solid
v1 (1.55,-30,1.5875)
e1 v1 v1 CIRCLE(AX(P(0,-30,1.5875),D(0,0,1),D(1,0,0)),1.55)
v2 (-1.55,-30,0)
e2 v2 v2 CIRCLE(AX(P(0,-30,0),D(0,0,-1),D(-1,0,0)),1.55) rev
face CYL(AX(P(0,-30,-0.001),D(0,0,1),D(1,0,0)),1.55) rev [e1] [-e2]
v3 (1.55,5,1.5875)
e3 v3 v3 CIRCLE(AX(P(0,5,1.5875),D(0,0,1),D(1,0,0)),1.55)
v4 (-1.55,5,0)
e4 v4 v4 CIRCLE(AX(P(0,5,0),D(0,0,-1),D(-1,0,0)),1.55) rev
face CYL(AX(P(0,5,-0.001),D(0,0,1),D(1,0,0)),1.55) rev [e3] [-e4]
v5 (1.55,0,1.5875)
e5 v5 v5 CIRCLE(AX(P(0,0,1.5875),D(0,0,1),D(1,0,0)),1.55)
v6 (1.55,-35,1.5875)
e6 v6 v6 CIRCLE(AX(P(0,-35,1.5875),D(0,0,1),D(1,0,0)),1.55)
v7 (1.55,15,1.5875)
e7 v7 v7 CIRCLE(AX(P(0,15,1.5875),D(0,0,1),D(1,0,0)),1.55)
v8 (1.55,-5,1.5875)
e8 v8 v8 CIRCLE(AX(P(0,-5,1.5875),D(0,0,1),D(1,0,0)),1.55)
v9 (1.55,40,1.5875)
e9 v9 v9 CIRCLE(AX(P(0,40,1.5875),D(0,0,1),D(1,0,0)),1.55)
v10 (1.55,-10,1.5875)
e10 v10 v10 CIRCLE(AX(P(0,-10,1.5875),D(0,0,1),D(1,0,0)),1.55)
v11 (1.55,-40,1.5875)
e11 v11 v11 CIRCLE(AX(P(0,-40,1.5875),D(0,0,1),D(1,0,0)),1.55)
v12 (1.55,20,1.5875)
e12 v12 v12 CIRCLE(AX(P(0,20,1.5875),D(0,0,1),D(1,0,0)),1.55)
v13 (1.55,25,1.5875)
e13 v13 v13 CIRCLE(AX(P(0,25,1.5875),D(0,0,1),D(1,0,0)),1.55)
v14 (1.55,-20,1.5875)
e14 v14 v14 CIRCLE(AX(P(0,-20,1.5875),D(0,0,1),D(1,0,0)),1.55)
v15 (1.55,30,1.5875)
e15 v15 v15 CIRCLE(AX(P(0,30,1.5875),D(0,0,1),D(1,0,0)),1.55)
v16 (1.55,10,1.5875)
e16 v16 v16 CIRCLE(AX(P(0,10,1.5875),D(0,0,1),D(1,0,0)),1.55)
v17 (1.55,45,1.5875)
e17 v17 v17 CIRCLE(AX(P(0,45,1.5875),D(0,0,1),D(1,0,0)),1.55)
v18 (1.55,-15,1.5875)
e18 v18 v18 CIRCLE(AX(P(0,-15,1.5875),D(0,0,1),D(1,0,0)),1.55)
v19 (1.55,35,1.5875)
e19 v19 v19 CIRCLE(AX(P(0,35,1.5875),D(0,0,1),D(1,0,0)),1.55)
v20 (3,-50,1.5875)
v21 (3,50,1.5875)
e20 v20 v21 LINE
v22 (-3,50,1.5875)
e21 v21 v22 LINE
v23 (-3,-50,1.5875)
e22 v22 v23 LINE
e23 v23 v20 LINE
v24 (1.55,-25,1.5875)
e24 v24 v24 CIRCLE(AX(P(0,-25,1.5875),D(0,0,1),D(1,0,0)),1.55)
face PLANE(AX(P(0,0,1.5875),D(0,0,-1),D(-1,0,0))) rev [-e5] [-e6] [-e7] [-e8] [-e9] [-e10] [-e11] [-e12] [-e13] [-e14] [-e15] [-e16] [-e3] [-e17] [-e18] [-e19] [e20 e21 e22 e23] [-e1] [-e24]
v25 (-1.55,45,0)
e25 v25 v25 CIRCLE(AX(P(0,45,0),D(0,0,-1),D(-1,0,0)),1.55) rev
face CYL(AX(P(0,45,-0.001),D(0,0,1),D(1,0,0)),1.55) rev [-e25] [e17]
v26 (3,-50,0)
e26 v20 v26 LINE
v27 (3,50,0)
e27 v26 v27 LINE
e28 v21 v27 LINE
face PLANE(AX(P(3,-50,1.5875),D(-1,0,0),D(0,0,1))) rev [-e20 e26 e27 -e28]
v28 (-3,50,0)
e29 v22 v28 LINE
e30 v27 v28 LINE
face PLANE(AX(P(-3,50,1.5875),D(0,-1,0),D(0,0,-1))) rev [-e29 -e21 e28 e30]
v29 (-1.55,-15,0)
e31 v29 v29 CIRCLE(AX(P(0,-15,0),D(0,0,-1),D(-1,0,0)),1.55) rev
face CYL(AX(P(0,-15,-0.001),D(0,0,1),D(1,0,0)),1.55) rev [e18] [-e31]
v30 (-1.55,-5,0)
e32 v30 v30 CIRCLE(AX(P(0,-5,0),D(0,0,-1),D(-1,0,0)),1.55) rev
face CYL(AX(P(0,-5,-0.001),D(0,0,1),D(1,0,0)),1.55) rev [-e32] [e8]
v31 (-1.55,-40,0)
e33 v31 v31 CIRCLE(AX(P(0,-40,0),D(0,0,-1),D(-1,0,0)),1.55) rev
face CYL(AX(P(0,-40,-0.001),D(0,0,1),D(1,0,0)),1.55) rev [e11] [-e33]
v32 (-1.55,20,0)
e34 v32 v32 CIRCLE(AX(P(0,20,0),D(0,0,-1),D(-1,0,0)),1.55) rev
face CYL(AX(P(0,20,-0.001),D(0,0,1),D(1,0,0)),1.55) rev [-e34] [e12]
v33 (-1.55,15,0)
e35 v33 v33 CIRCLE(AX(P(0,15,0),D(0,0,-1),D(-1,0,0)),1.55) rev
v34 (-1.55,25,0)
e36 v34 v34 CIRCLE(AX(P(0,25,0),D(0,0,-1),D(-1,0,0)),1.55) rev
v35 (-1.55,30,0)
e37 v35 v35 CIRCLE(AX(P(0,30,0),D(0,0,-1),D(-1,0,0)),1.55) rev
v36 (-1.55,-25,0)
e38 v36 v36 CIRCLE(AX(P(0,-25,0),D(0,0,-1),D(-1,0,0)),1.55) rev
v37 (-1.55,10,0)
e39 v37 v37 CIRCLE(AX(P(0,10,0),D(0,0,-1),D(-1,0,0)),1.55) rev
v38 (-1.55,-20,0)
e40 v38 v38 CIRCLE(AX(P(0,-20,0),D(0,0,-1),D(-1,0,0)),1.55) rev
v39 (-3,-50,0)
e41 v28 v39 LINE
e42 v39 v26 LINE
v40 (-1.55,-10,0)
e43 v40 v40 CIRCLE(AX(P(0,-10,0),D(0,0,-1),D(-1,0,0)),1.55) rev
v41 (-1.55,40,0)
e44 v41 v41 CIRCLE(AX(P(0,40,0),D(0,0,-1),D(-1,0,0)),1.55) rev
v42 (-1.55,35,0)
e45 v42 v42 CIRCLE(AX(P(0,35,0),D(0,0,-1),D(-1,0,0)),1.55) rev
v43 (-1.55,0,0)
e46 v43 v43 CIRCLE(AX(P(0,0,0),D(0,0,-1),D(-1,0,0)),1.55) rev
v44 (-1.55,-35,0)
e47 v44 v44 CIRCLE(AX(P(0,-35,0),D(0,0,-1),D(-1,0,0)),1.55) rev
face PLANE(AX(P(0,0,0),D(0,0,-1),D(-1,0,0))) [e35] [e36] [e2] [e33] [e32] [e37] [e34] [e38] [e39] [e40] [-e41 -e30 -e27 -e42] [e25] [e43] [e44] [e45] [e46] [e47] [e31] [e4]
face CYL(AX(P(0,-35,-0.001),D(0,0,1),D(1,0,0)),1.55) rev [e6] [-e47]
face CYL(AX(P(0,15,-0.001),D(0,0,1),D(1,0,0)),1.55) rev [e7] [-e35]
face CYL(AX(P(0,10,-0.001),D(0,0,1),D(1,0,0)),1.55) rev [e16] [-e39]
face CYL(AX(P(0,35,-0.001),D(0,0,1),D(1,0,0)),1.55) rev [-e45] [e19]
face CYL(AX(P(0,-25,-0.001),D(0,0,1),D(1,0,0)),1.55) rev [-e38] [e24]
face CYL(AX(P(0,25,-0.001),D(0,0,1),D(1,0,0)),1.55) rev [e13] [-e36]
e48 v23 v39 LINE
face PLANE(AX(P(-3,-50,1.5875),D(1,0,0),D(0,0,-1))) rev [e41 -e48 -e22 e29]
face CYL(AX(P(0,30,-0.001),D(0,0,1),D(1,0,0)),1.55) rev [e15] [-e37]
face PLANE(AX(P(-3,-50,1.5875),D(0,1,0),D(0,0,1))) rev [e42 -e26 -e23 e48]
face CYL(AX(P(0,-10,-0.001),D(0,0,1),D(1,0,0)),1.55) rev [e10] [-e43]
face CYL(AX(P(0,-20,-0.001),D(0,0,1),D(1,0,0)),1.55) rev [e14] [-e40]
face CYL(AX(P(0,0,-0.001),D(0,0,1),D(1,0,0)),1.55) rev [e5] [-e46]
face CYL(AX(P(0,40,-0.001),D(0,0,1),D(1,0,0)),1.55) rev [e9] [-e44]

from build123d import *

# Parameters (mm, degrees)
SKETCH1_W           = 6
SKETCH1_H           = 100
MAINBODY_DEPTH      = 1.5875
PEGHOLE_REACH       = 52.115
SKETCH2_R           = 1.55
LPATTERN1_COUNT     = 9
LPATTERN1_PITCH     = 5
LPATTERN2_OUTLINE_R = 1.55
LPATTERN2_DEPTH     = 1.5875


# Read off the part's stored shape, not the designer's step: LPattern2
with BuildPart() as part:
    # Sketch1 → MainBody (new body)
    with BuildSketch(Plane.XY):
        Rectangle(SKETCH1_W, SKETCH1_H)
    extrude(amount=MAINBODY_DEPTH)

    # Sketch2 → PegHole (cut, up to next)
    with BuildSketch(Plane.XY.offset(1.5875), mode=Mode.PRIVATE) as peghole_sk1:
        Circle(SKETCH2_R)
    peghole_tool1 = extrude(peghole_sk1.sketch, amount=-PEGHOLE_REACH, mode=Mode.PRIVATE) & part.part
    peghole = peghole_tool1.solids().sort_by_distance((0, 0, 1.5875))[0]
    add(peghole, mode=Mode.SUBTRACT)

    # LPattern1: PegHole ×9
    with Locations(*[(0, -i * LPATTERN1_PITCH, 0) for i in range(1, LPATTERN1_COUNT)]):
        add(peghole, mode=Mode.SUBTRACT)

    # LPattern2 outline → LPattern2 (cut)
    with BuildSketch(Plane.XY):
        with Locations((0, 5)):
            Circle(LPATTERN2_OUTLINE_R)
        with Locations((0, 10)):
            Circle(LPATTERN2_OUTLINE_R)
        with Locations((0, 15)):
            Circle(LPATTERN2_OUTLINE_R)
        with Locations((0, 20)):
            Circle(LPATTERN2_OUTLINE_R)
        with Locations((0, 25)):
            Circle(LPATTERN2_OUTLINE_R)
        with Locations((0, 30)):
            Circle(LPATTERN2_OUTLINE_R)
        with Locations((0, 35)):
            Circle(LPATTERN2_OUTLINE_R)
        with Locations((0, 40)):
            Circle(LPATTERN2_OUTLINE_R)
        with Locations((0, 45)):
            Circle(LPATTERN2_OUTLINE_R)
    extrude(amount=LPATTERN2_DEPTH, mode=Mode.SUBTRACT)


solid = part.part
